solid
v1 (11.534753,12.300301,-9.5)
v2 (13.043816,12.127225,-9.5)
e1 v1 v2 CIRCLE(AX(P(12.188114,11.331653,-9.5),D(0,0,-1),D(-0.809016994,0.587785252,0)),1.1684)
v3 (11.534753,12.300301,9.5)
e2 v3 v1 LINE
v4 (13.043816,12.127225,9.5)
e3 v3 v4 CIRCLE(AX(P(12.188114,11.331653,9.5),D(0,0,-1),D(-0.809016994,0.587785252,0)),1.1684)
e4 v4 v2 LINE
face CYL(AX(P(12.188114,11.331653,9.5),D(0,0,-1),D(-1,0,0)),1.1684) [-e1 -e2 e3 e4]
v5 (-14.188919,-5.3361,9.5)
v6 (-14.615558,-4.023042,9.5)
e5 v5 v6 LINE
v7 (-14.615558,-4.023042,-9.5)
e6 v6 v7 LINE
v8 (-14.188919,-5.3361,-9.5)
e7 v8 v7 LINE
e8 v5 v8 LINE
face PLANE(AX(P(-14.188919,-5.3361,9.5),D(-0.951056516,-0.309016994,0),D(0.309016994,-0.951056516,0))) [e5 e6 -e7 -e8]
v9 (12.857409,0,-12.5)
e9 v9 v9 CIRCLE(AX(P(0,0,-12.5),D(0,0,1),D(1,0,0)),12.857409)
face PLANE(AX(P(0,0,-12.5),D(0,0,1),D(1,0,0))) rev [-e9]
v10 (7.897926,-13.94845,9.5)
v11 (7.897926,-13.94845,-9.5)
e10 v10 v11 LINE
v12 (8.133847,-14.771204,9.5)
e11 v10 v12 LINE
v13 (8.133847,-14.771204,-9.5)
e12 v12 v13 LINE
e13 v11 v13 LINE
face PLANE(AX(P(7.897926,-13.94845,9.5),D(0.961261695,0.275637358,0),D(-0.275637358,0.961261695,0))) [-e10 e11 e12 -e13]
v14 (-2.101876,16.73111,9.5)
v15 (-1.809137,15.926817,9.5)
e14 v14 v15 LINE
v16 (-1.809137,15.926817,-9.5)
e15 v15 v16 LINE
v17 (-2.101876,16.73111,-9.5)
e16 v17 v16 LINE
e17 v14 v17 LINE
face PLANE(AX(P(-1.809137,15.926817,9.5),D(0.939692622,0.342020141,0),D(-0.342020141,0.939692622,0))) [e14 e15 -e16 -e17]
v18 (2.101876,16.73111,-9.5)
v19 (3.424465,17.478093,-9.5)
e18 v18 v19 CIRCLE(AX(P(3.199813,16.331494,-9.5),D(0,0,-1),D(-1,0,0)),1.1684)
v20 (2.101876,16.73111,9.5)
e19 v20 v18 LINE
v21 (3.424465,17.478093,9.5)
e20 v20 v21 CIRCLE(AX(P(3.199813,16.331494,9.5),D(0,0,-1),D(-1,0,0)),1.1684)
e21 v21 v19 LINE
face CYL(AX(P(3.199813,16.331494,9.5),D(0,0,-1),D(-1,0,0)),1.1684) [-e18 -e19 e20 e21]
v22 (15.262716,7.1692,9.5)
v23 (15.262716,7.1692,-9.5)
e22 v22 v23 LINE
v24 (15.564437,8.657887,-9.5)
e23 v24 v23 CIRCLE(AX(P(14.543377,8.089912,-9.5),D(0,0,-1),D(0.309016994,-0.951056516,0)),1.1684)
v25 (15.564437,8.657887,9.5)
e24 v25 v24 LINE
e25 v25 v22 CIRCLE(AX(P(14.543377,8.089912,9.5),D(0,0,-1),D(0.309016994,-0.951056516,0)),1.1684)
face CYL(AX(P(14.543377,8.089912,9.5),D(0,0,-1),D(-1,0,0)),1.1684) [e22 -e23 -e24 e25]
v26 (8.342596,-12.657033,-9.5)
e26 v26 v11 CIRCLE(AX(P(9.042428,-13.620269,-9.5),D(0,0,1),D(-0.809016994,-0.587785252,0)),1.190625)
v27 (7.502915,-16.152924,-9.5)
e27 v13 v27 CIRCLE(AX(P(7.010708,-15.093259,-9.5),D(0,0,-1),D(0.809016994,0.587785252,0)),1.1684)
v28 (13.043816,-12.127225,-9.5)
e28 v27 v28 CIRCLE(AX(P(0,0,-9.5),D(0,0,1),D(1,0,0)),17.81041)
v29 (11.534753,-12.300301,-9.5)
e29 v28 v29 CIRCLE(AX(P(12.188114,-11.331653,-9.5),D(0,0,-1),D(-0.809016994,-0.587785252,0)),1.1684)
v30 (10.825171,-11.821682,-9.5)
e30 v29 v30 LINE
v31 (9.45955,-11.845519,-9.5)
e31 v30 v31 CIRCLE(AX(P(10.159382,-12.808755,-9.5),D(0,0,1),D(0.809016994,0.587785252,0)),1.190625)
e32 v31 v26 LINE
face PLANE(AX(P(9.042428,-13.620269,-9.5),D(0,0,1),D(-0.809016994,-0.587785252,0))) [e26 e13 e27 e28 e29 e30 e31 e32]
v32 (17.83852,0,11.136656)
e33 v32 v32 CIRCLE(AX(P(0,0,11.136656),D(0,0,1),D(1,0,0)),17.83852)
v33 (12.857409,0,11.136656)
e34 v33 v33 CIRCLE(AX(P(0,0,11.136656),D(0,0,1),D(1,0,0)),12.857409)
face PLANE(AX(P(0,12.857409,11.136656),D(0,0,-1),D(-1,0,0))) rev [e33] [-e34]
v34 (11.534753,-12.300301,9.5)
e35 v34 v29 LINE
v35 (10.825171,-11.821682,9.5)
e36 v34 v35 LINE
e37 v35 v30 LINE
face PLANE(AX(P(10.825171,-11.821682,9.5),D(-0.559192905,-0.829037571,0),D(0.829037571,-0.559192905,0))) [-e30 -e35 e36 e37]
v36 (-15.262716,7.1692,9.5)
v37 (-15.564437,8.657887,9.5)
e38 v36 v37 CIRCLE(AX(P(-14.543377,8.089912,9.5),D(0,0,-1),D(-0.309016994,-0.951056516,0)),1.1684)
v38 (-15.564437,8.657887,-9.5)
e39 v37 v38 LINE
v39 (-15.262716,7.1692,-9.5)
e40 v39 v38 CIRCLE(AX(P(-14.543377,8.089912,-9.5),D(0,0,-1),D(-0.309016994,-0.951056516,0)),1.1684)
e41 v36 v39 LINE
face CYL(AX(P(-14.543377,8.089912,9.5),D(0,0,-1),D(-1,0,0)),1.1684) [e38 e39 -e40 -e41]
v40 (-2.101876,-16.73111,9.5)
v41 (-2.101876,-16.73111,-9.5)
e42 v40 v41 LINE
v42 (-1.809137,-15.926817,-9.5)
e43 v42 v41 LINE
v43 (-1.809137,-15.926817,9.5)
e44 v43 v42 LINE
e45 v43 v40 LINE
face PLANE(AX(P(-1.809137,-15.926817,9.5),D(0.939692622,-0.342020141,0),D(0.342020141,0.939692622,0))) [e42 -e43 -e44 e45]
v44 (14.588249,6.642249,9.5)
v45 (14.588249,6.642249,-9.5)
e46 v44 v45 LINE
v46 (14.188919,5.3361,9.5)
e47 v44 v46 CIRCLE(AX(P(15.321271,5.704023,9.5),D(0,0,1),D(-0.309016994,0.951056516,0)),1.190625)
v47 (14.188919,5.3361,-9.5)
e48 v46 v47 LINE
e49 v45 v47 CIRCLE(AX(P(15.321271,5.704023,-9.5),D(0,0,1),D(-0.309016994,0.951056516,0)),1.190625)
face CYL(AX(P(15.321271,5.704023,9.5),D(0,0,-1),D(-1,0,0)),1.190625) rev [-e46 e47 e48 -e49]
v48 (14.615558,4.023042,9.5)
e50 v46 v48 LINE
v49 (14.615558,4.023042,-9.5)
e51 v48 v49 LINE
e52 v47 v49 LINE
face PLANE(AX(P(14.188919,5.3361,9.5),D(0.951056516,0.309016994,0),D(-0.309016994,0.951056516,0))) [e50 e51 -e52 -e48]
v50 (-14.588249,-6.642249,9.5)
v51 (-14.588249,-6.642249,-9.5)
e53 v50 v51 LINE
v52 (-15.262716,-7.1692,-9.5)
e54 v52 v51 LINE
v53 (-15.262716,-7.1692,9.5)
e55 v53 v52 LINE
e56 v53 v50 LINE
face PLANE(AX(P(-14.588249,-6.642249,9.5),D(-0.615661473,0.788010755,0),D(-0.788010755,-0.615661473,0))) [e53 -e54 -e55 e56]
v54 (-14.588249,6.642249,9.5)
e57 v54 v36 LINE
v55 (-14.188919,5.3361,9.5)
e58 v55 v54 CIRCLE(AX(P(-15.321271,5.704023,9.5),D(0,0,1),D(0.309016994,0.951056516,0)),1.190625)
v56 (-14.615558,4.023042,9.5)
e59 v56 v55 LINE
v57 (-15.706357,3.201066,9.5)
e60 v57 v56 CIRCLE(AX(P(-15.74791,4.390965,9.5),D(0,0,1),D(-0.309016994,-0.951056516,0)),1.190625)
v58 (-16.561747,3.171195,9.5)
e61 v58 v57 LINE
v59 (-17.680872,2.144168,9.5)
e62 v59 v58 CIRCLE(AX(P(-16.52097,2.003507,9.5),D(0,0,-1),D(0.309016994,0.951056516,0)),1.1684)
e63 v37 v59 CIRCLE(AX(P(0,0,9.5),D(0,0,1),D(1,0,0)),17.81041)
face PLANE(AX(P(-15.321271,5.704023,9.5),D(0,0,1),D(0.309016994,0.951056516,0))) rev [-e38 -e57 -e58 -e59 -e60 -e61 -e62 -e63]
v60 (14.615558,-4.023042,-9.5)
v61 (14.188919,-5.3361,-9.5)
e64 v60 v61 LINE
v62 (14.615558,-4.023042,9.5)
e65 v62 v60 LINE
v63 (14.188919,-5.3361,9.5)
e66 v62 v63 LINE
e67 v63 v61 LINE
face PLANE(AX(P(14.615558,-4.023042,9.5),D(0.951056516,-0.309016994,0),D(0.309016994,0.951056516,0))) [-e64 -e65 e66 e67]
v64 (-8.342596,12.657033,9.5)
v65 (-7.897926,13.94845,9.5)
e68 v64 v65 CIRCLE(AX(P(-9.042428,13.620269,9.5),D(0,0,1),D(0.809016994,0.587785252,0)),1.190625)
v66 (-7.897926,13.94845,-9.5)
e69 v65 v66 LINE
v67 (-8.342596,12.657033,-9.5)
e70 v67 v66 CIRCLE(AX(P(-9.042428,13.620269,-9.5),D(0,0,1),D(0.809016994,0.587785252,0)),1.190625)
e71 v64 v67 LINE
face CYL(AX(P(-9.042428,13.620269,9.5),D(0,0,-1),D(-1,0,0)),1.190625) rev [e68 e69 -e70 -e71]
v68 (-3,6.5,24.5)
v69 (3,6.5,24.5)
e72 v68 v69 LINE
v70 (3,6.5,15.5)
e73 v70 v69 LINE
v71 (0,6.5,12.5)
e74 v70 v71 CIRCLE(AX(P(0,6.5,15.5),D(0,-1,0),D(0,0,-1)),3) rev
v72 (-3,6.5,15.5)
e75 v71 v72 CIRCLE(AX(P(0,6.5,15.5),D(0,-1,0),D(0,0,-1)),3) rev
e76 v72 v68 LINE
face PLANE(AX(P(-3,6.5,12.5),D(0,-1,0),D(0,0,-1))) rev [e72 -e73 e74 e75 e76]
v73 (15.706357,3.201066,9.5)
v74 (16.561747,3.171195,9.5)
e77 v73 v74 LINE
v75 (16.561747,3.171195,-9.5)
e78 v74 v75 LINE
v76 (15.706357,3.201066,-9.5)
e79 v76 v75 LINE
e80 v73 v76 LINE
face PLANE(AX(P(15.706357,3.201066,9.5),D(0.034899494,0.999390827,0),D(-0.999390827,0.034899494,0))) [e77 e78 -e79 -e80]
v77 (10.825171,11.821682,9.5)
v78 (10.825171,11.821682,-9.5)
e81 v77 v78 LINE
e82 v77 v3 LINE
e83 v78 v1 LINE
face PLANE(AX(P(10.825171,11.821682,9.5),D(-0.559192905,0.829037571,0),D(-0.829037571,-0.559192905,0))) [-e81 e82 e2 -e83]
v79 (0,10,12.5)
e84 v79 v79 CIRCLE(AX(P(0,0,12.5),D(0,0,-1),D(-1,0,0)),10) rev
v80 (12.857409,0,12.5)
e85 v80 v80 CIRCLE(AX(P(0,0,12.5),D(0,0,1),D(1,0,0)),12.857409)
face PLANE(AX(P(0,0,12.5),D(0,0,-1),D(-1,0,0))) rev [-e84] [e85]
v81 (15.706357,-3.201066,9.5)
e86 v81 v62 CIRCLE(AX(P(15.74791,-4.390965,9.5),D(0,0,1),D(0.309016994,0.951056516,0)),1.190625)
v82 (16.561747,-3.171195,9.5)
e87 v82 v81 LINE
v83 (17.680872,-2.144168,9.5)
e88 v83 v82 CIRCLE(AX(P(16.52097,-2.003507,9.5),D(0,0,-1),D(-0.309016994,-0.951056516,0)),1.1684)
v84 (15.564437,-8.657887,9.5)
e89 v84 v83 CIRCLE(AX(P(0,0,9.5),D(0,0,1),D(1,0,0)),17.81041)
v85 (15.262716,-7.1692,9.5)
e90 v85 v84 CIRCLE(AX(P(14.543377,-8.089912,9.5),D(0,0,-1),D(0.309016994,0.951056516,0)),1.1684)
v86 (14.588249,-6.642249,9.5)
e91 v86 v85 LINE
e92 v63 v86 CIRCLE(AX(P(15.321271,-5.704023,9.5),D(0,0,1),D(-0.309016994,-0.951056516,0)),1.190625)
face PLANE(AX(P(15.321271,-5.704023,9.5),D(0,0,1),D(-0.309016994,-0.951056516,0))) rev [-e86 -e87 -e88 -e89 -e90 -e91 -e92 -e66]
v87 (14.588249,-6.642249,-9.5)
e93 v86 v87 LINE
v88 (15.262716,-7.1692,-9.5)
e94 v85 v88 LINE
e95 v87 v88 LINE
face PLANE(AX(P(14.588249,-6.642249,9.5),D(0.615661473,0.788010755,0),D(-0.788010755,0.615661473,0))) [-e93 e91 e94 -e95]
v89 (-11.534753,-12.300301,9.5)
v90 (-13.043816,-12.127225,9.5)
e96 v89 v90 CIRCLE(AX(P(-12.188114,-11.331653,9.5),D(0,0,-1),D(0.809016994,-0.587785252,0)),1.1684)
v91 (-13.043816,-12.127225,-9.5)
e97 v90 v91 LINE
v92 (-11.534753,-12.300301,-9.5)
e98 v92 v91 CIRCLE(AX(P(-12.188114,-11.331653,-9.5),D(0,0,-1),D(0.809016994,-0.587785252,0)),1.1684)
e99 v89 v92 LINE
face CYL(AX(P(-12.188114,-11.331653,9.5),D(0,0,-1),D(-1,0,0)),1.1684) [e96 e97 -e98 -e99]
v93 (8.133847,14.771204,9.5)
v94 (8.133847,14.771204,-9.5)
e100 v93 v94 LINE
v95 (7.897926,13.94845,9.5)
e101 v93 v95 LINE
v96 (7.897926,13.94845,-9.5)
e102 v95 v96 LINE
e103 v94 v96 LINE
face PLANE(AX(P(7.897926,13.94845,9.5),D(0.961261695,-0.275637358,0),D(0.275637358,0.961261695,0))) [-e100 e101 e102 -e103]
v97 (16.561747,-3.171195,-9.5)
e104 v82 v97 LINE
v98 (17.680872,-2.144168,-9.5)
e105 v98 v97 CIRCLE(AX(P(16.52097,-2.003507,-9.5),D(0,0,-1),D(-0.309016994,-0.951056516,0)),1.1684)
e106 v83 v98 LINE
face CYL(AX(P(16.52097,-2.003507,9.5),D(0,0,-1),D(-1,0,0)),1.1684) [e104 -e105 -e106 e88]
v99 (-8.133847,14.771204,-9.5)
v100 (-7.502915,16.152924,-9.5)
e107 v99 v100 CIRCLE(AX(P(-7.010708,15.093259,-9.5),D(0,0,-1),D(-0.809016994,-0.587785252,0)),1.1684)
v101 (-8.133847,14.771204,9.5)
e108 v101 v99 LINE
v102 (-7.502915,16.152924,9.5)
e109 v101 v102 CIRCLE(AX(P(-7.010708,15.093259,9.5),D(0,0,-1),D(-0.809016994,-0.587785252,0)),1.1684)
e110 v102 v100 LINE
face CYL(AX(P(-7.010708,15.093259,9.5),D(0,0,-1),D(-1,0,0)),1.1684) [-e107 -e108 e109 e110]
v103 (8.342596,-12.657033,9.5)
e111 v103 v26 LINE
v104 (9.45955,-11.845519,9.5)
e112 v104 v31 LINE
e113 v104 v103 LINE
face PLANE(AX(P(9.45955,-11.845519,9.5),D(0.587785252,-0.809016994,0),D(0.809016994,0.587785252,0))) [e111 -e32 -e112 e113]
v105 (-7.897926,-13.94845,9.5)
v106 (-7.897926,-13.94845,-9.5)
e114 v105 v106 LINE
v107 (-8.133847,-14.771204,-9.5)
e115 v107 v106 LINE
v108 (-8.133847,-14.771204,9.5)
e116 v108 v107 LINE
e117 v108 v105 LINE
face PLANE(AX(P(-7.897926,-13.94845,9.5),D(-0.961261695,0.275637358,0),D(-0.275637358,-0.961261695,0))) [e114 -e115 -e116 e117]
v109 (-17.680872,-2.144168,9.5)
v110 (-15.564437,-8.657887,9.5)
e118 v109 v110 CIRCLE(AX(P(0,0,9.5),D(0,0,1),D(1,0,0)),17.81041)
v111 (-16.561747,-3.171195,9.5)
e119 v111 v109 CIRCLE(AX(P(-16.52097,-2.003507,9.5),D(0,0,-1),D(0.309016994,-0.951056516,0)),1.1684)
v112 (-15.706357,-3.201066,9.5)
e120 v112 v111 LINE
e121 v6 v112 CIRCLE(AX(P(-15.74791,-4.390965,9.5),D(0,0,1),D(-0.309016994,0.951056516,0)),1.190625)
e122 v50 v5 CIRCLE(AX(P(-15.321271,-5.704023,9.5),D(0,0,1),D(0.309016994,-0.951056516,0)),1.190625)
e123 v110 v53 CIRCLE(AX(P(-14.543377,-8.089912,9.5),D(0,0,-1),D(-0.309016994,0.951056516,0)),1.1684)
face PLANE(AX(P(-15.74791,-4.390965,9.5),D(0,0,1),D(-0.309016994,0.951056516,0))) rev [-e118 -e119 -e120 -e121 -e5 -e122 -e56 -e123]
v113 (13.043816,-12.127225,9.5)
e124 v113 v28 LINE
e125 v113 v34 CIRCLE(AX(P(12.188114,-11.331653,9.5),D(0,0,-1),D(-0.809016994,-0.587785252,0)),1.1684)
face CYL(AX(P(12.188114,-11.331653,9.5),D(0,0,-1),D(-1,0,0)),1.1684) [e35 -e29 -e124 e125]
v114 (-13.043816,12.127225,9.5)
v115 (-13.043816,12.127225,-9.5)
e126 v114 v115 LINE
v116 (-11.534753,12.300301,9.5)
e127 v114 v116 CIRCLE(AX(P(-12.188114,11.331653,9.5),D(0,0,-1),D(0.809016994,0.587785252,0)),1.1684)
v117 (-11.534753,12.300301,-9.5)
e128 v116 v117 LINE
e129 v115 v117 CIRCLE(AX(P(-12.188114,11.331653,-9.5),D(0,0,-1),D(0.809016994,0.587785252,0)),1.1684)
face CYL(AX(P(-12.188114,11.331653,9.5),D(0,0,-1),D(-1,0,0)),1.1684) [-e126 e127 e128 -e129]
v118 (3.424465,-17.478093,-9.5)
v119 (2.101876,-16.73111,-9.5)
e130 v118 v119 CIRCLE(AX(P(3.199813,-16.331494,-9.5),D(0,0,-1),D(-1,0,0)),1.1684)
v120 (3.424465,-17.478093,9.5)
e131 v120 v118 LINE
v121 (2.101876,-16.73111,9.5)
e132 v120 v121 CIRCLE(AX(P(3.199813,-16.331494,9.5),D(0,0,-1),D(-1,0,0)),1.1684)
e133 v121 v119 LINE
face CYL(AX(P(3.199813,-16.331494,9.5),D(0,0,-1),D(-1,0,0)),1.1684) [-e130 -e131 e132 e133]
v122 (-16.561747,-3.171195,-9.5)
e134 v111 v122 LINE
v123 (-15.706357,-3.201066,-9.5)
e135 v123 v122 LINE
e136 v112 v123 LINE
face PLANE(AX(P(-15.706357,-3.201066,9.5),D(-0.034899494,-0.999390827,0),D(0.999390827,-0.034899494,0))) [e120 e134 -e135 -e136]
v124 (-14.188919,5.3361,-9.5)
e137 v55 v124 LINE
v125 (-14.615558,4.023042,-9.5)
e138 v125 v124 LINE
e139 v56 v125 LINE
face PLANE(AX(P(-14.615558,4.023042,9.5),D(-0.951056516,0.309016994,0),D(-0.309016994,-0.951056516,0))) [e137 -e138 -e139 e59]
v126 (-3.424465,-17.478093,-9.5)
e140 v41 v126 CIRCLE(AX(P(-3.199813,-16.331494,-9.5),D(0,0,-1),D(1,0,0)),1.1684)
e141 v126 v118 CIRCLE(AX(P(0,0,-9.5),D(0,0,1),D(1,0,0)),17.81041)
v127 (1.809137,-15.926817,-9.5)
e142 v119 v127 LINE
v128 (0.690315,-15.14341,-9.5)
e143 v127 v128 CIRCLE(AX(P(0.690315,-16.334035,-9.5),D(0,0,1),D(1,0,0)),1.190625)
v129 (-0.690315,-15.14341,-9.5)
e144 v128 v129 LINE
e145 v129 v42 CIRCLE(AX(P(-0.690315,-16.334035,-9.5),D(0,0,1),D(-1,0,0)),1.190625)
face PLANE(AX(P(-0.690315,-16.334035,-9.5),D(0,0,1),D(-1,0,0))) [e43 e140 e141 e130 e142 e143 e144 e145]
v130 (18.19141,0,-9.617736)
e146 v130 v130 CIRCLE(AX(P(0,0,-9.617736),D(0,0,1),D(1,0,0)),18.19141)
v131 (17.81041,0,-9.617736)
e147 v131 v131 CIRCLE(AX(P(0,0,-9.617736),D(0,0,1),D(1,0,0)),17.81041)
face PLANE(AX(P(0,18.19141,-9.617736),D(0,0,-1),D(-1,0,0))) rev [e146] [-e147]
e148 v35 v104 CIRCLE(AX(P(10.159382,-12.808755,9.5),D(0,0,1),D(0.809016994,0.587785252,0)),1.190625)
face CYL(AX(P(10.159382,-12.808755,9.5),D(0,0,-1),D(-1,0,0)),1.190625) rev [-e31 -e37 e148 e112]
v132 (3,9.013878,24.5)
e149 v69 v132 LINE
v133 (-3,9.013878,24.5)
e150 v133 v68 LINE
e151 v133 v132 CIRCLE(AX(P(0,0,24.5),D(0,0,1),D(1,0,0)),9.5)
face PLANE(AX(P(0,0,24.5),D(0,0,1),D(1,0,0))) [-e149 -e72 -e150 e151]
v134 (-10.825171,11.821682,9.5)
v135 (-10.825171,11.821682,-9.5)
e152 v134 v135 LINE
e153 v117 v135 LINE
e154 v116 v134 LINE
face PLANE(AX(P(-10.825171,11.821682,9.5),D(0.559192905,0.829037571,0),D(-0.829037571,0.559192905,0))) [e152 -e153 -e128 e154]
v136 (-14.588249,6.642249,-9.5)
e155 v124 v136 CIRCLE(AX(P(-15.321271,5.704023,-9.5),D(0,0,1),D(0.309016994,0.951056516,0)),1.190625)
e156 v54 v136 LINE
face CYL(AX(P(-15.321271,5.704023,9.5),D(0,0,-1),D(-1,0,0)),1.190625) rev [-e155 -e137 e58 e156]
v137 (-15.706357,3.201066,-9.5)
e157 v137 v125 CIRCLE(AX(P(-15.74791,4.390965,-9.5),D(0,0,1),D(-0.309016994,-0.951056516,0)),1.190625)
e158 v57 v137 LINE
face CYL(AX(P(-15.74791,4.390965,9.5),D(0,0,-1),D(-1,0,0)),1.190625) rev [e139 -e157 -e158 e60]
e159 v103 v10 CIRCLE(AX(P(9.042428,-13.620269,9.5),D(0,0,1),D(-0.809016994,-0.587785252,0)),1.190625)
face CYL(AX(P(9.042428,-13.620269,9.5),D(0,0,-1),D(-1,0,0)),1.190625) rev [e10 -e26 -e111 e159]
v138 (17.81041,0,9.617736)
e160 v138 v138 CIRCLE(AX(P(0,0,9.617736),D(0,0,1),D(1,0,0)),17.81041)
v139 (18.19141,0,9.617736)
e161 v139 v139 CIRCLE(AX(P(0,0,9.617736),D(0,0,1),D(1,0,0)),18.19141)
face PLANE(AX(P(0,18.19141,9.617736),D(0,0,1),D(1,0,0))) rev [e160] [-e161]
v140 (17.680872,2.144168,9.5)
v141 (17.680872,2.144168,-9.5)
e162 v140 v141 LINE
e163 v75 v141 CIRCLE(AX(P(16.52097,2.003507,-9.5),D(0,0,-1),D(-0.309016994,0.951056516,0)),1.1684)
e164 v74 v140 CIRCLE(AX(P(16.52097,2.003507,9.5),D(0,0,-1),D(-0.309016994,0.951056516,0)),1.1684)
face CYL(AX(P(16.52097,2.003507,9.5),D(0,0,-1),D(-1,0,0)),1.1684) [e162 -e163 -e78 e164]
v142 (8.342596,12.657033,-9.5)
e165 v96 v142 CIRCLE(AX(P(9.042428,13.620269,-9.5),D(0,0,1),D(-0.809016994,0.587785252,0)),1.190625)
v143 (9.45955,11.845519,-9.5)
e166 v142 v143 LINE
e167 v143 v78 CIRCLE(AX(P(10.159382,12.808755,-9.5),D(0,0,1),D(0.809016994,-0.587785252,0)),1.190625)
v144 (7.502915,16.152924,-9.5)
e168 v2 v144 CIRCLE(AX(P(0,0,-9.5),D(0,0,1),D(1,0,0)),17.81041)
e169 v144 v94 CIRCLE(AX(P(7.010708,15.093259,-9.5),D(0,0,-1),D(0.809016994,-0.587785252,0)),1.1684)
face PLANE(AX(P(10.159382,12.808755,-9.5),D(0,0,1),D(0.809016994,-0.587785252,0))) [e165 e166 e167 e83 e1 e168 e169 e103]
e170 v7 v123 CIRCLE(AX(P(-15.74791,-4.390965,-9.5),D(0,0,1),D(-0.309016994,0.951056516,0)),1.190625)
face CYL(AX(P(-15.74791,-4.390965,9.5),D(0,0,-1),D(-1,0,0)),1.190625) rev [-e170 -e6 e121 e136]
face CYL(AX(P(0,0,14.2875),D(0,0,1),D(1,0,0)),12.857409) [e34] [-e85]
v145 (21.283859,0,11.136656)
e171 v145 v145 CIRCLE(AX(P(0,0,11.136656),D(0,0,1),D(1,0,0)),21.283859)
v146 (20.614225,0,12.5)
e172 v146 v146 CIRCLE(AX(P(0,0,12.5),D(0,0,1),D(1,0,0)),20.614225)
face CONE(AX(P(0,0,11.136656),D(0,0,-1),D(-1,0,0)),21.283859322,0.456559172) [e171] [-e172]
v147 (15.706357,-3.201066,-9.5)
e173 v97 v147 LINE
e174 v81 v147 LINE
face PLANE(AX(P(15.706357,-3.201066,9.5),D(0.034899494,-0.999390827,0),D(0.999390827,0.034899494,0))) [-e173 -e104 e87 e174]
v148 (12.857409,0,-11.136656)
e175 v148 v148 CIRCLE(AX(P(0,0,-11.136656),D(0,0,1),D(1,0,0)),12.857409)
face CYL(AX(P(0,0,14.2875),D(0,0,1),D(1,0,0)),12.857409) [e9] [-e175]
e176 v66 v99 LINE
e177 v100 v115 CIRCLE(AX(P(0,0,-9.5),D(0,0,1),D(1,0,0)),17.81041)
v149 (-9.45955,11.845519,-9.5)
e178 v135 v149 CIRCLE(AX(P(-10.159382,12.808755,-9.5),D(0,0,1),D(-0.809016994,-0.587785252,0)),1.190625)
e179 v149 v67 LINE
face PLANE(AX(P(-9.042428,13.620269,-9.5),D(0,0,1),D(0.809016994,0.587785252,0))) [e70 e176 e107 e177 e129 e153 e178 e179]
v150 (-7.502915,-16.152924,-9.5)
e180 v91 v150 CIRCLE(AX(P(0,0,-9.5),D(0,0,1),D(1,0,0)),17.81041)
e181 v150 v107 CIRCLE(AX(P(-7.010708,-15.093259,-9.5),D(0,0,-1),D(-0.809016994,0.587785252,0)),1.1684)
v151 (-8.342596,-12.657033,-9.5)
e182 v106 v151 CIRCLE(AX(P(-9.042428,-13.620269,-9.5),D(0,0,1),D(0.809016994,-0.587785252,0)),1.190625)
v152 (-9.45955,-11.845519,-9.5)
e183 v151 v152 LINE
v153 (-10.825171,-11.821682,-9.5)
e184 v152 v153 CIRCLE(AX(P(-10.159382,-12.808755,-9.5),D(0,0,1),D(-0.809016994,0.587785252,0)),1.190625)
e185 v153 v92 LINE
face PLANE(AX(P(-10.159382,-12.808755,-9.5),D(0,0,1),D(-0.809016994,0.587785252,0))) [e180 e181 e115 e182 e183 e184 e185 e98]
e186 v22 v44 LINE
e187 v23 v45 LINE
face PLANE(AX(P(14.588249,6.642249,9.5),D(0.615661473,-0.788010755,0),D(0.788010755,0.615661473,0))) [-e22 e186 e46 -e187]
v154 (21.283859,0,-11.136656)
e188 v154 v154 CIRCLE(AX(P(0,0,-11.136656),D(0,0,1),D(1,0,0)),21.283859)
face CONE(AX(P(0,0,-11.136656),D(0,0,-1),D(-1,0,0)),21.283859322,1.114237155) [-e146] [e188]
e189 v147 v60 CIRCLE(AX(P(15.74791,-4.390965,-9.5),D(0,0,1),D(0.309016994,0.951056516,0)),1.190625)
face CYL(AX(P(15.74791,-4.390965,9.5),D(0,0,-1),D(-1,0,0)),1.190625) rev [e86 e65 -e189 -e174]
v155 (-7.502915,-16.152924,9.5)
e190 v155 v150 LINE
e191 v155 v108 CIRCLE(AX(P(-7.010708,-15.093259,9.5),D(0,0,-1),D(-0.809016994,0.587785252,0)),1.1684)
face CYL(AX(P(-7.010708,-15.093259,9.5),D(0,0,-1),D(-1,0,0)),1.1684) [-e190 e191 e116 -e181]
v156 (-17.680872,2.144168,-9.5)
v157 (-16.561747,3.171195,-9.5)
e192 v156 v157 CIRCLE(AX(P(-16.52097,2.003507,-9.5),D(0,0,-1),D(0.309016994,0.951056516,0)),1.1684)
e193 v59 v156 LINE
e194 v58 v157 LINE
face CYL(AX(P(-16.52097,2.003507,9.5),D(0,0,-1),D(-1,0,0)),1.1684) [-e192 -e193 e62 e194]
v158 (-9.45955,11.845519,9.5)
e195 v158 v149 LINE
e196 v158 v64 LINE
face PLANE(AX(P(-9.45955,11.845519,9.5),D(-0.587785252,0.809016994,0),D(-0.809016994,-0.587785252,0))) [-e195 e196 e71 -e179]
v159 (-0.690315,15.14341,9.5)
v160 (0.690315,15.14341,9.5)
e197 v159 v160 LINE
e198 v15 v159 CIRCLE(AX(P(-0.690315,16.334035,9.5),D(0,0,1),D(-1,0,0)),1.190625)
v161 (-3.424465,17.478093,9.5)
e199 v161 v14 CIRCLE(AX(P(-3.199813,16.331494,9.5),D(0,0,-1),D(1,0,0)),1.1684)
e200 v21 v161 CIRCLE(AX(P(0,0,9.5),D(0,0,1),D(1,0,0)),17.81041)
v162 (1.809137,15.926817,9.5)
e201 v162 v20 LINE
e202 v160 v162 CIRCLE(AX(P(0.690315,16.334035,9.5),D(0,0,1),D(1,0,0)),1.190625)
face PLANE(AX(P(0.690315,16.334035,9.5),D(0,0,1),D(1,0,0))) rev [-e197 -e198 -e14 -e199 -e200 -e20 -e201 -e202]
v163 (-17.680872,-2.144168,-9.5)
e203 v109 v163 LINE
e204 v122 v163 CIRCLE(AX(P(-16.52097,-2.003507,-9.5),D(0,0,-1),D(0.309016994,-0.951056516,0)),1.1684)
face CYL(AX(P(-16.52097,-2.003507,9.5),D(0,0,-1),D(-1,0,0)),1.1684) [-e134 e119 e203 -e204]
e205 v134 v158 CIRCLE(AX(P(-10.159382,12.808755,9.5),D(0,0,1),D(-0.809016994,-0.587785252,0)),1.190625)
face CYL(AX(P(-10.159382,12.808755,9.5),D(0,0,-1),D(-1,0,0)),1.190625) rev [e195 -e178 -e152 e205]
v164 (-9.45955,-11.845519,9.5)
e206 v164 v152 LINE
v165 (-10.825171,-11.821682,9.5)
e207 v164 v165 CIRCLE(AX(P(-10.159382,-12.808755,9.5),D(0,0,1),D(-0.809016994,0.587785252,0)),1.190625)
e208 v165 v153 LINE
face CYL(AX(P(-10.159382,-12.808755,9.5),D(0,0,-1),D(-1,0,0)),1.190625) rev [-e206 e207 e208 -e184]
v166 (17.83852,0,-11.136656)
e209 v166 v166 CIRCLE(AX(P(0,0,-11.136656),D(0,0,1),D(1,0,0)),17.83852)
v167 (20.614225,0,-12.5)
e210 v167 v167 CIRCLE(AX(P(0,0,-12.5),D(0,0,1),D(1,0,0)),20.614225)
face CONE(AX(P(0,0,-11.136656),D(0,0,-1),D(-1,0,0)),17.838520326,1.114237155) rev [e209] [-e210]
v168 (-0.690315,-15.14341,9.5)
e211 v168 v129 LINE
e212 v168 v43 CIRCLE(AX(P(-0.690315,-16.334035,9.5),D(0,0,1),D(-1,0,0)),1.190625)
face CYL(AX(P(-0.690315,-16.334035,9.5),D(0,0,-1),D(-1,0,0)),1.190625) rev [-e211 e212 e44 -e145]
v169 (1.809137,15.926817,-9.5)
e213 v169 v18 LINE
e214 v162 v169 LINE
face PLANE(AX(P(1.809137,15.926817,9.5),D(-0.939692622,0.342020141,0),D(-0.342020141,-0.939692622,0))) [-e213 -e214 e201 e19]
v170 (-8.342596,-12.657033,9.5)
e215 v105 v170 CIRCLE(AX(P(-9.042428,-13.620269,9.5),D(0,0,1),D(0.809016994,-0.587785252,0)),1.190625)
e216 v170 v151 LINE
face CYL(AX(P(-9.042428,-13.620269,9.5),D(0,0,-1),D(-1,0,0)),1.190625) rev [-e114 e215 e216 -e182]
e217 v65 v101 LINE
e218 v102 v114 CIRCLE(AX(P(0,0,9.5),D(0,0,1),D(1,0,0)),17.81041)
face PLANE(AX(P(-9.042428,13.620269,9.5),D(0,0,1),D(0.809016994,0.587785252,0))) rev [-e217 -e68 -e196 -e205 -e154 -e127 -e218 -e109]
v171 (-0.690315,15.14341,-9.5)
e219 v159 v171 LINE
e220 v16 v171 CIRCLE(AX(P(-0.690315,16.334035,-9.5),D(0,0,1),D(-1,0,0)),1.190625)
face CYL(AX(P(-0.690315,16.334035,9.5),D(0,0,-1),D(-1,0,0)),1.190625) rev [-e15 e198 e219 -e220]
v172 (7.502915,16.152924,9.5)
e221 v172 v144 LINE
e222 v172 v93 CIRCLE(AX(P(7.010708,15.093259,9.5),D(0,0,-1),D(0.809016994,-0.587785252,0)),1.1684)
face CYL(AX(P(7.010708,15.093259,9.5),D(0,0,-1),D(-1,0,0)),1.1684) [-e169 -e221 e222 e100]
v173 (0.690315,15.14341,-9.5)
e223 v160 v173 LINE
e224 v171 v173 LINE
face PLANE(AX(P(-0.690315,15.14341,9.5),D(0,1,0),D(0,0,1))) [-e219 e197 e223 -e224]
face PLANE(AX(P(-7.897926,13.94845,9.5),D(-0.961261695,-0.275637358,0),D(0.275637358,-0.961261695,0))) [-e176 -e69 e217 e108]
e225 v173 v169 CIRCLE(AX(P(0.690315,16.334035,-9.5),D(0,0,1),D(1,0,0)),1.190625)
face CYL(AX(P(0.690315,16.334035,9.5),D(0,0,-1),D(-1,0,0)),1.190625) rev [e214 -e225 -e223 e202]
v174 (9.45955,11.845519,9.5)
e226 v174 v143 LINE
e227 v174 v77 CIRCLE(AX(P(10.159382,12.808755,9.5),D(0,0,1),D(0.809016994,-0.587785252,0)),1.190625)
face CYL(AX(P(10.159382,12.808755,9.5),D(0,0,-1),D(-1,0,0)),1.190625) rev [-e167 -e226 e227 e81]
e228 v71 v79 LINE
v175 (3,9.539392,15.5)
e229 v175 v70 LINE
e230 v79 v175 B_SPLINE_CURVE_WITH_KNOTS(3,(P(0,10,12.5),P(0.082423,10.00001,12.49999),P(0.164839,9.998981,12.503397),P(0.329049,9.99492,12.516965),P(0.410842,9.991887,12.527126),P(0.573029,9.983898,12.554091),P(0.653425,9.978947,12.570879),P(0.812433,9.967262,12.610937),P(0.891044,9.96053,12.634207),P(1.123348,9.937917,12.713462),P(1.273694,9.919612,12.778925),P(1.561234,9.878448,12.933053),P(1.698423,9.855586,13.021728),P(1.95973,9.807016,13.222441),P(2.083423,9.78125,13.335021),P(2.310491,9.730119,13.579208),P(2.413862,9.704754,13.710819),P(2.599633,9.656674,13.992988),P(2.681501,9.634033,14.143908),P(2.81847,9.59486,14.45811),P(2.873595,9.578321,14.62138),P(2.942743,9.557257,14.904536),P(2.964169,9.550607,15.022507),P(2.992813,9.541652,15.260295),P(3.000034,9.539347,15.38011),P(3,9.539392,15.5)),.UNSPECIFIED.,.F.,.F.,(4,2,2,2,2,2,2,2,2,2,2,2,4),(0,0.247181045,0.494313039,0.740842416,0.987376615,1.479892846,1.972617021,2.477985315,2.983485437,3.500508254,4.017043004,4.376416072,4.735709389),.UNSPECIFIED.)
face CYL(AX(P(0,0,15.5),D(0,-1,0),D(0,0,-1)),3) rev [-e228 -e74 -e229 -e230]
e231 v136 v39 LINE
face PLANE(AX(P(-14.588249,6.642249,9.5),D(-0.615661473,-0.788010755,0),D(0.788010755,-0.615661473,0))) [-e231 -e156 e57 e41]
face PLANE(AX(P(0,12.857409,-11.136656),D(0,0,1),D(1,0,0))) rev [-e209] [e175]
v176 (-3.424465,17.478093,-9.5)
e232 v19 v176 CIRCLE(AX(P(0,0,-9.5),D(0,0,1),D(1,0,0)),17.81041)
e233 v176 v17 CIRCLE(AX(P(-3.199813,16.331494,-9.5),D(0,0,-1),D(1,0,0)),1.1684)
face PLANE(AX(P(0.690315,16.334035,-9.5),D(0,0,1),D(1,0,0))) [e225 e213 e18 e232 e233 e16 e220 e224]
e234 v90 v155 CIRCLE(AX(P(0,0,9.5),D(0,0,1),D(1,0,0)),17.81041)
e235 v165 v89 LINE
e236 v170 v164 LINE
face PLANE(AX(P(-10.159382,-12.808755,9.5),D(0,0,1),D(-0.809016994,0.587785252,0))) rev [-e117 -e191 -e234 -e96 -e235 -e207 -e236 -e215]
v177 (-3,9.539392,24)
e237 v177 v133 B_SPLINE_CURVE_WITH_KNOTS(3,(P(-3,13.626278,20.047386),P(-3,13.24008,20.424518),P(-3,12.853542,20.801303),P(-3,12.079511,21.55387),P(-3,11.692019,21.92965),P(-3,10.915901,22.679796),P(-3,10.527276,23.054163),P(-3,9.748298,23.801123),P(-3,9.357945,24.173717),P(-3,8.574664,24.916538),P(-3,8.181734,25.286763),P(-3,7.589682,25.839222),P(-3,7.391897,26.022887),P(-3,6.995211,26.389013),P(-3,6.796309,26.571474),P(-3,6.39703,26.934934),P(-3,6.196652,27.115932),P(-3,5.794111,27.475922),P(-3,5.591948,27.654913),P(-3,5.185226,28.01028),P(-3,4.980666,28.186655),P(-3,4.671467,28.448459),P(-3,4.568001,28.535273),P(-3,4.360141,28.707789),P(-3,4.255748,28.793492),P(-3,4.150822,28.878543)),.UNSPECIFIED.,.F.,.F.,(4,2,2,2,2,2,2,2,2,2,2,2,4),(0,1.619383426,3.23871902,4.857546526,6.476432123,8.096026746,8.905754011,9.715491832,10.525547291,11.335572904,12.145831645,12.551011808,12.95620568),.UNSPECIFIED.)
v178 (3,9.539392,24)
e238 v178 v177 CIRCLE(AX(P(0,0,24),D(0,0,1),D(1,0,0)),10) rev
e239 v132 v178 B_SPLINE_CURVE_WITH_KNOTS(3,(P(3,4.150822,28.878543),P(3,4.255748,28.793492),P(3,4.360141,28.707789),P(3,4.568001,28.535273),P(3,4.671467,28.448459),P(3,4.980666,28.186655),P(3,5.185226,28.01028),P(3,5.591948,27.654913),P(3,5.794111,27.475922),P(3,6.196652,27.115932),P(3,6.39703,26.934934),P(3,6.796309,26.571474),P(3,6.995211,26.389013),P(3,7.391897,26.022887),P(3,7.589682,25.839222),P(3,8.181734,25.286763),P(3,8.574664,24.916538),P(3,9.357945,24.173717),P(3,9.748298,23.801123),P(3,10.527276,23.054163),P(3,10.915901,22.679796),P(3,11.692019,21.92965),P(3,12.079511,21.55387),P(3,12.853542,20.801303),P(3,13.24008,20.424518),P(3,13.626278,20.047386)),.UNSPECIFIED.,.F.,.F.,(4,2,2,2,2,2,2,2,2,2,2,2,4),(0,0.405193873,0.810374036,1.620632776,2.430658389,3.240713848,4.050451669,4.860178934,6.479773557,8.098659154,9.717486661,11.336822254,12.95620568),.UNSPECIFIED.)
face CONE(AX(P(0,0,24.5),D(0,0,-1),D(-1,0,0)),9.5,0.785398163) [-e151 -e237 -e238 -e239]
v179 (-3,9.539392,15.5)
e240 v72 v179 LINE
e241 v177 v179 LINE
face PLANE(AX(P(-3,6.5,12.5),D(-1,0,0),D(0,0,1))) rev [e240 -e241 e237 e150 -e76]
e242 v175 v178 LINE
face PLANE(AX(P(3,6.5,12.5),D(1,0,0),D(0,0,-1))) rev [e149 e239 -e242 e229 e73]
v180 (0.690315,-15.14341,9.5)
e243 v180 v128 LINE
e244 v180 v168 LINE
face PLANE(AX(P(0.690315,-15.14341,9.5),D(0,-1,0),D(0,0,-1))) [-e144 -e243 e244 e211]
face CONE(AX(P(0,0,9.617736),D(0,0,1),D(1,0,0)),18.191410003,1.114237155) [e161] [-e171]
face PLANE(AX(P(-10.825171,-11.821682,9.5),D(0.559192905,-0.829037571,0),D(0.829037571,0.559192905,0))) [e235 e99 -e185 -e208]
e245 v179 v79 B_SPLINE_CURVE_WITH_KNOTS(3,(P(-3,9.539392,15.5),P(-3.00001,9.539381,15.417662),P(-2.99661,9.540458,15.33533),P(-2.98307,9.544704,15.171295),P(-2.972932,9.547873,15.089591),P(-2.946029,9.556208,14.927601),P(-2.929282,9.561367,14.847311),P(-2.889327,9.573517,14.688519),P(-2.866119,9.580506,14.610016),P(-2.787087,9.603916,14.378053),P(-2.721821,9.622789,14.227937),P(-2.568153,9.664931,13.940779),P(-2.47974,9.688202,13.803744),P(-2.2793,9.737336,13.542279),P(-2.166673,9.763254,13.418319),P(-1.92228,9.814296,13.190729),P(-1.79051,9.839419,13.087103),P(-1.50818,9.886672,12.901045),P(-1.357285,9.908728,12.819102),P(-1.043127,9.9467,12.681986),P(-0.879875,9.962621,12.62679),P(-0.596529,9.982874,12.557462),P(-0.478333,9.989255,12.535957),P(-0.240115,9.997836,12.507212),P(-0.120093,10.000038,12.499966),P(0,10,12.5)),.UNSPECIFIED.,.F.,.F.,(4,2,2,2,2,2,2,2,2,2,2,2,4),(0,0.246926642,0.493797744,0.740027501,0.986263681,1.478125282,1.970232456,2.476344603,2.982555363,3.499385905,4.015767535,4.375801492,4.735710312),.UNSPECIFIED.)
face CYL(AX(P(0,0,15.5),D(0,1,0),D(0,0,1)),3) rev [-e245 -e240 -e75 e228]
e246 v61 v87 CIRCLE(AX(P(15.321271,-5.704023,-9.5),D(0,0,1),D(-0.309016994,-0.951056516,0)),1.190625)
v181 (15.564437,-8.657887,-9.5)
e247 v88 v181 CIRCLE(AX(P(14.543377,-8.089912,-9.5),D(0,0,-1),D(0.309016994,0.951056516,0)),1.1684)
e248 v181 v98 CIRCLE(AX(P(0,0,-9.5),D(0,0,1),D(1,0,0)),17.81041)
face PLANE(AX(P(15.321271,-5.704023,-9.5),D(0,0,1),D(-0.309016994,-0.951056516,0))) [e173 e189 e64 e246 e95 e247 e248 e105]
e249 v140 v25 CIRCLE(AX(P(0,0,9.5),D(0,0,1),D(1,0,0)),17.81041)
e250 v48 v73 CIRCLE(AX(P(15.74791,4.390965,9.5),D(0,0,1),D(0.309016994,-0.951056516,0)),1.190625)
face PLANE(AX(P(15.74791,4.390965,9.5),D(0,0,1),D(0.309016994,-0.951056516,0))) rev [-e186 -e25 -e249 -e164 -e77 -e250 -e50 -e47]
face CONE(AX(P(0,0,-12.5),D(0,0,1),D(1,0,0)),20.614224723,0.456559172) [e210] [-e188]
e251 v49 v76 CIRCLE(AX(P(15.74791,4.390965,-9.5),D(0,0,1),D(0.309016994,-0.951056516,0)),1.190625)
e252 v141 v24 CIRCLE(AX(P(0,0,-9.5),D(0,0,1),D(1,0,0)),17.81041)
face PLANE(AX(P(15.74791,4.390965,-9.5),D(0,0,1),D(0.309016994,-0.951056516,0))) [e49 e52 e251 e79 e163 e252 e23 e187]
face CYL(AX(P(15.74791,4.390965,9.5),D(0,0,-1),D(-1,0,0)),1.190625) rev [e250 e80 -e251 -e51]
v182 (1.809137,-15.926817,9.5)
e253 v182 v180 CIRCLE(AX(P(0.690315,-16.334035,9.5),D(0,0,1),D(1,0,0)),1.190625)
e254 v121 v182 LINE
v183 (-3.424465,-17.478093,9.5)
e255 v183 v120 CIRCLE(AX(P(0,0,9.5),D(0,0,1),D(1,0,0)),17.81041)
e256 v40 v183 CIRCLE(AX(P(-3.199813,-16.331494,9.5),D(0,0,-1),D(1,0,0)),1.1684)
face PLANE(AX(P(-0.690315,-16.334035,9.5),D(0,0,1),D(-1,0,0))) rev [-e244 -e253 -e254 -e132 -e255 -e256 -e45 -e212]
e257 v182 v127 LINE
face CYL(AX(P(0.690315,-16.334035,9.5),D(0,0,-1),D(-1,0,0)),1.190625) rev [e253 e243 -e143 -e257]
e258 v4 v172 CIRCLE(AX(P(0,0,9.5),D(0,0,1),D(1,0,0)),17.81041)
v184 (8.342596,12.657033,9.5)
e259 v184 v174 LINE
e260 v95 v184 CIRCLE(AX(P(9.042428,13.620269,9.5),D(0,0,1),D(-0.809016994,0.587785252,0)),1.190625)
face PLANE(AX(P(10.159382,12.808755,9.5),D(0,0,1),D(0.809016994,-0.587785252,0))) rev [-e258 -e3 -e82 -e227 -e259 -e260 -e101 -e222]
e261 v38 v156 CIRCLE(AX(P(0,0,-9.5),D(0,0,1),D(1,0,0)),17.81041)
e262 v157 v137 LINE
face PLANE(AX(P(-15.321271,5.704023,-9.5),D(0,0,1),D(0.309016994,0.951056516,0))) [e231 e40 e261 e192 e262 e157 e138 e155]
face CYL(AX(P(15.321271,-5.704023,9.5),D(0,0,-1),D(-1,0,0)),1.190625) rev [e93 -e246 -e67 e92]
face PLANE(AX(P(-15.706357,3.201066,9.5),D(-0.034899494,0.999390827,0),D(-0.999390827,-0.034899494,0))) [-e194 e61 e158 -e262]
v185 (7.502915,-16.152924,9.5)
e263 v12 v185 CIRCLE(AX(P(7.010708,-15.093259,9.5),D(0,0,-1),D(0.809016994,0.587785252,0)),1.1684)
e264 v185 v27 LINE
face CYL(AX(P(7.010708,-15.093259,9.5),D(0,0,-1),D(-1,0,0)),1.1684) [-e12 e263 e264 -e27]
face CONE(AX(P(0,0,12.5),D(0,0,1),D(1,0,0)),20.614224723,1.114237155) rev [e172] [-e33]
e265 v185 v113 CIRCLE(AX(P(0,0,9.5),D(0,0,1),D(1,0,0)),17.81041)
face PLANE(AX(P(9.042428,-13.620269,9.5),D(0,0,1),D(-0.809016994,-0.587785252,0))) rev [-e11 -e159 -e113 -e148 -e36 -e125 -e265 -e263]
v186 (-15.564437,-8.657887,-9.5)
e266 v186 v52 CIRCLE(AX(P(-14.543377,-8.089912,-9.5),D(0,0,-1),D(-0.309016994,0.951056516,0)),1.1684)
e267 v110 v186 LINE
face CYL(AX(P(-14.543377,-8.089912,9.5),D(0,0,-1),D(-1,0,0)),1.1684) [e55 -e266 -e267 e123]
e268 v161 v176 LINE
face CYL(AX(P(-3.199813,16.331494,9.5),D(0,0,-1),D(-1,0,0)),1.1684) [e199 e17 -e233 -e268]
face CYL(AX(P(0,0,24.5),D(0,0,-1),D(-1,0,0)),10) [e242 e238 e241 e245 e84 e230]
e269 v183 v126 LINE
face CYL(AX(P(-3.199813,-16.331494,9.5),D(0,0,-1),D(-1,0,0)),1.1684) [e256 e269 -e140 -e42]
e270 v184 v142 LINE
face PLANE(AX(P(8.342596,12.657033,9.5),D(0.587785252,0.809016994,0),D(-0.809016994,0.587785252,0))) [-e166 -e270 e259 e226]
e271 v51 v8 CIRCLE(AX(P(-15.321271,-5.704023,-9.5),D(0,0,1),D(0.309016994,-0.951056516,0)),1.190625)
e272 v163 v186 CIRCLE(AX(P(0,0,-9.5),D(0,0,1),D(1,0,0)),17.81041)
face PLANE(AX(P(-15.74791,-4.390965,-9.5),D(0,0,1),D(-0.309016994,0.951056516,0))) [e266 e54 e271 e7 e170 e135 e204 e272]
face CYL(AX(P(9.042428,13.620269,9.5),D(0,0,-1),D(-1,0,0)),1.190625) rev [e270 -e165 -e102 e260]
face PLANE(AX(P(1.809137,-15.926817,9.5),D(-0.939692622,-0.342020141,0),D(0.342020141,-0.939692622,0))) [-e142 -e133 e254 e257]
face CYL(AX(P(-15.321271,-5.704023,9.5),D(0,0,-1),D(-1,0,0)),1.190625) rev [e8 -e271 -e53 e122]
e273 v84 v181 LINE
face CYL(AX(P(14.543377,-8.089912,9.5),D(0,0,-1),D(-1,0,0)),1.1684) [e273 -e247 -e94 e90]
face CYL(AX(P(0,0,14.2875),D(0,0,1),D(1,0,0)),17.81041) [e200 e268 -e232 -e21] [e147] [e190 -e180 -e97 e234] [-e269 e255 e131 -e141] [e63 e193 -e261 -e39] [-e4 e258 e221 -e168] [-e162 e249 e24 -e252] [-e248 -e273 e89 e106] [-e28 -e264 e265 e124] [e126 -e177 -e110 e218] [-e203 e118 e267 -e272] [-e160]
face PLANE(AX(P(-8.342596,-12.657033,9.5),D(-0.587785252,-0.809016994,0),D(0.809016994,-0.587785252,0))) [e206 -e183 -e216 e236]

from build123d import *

# Parameters (mm, degrees)
TOOTH_EXTRUDE_START      = -9.5
TOOTH_EXTRUDE_DEPTH      = 19
PATTERN_CIRCULAR_1_COUNT = 10
SKETCH_3_R               = 10
EXTRUDE_1_DEPTH          = 12
CHAMFER_1_SIZE           = 0.5
SKETCH_4_W               = 6
SKETCH_4_H               = 7
CUT_EXTRUDE_1_DEPTH      = 12
FILLET_1_R               = 3


with BuildPart() as part:
    # GearBelt-BaseSketch → 0.375in Pitch 'L', 0.500in Belt Width, 36.3828mm P.D. (revolve)
    with BuildSketch(Plane(origin=(0, 0, 0), x_dir=(0, 0, -1), z_dir=(1, 0, 0)), mode=Mode.PRIVATE) as f_0_375in_pitch_l_0_500in_belt_width_36_sk:
        Polygon((-12.5, 0), (12.5, 0), (12.5, 12.857409477), (11.136655608, 12.857409477), (11.136655608, 17.838520326), (12.5, 20.614224723), (11.136655777, 21.283859322), (9.617735592, 18.191410003), (9.617735592, 17.810409995), (-9.617735592, 17.810409995), (-9.617735592, 18.191410003), (-11.136655777, 21.283859322), (-12.5, 20.614224723), (-11.136655608, 17.838520326), (-11.136655608, 12.857409477), (-12.5, 12.857409477), align=None)
    revolve(f_0_375in_pitch_l_0_500in_belt_width_36_sk.sketch.rotate(Axis((0, 0, 14.2875), (0, 0, -1)), 90), axis=Axis((0, 0, 14.2875), (0, 0, -1)))

    # Tooth-Sketch → Tooth-Extrude (cut)
    with BuildSketch(Plane.XY.offset(TOOTH_EXTRUDE_START)):
        with BuildLine():
            Line((-0.690315485, 15.14340994), (0.690315485, 15.14340994))
            ThreePointArc((0.690315485, 15.14340994), (1.373229902, 15.358732029), (1.809136966, 15.926817177))
            Line((1.809136966, 15.926817177), (2.101875716, 16.731110287))
            ThreePointArc((2.101875716, 16.731110287), (2.625223607, 17.348846453), (3.424464642, 17.478093321))
            Line((3.424464642, 17.478093321), (3.424464642, 20.018093321))
            Line((3.424464642, 20.018093321), (-3.424464642, 20.018093321))
            Line((-3.424464642, 20.018093321), (-3.424464642, 17.478093321))
            ThreePointArc((-3.424464642, 17.478093321), (-2.625223607, 17.348846453), (-2.101875716, 16.731110287))
            Line((-2.101875716, 16.731110287), (-1.809136966, 15.926817177))
            ThreePointArc((-1.809136966, 15.926817177), (-1.373229902, 15.358732029), (-0.690315485, 15.14340994))
        make_face()
    tooth_extrude = extrude(amount=TOOTH_EXTRUDE_DEPTH, mode=Mode.SUBTRACT)

    # 阵列(圆周)1: Tooth-Extrude ×10 about axis
    pattern_circular_1_axis = Axis((0, 0, 0), (0, 0, 1))
    for i in range(1, PATTERN_CIRCULAR_1_COUNT):
        add(tooth_extrude.rotate(pattern_circular_1_axis, i * 360 / PATTERN_CIRCULAR_1_COUNT), mode=Mode.SUBTRACT)

    # 草图3 → 凸台-拉伸1 (add)
    with BuildSketch(Plane.XY.offset(12.5)):
        with Locations(Location((0, 0, 0), (0, 0, 180))):
            Circle(SKETCH_3_R)
    extrude(amount=EXTRUDE_1_DEPTH)

    # 倒角1
    chamfer_1_edges = [part.edges().sort_by_distance(p)[0] for p in [
        (10, 0, 24.5),
    ]]
    chamfer(chamfer_1_edges, length=CHAMFER_1_SIZE)

    # 草图4 → 切除-拉伸1 (cut)
    with BuildSketch(Plane.XY.offset(24.5)):
        with Locations((0, 10)):
            Rectangle(SKETCH_4_W, SKETCH_4_H)
    extrude(amount=-CUT_EXTRUDE_1_DEPTH, mode=Mode.SUBTRACT)

    # 圆角1
    fillet_1_edges = [part.edges().sort_by_distance(p)[0] for p in [
        (-3, 8.019696007, 12.5),
        (3, 8.019696007, 12.5),
    ]]
    fillet(fillet_1_edges, radius=FILLET_1_R - 0.0001)  # a hair under: the kernel refuses the full size


solid = part.part
